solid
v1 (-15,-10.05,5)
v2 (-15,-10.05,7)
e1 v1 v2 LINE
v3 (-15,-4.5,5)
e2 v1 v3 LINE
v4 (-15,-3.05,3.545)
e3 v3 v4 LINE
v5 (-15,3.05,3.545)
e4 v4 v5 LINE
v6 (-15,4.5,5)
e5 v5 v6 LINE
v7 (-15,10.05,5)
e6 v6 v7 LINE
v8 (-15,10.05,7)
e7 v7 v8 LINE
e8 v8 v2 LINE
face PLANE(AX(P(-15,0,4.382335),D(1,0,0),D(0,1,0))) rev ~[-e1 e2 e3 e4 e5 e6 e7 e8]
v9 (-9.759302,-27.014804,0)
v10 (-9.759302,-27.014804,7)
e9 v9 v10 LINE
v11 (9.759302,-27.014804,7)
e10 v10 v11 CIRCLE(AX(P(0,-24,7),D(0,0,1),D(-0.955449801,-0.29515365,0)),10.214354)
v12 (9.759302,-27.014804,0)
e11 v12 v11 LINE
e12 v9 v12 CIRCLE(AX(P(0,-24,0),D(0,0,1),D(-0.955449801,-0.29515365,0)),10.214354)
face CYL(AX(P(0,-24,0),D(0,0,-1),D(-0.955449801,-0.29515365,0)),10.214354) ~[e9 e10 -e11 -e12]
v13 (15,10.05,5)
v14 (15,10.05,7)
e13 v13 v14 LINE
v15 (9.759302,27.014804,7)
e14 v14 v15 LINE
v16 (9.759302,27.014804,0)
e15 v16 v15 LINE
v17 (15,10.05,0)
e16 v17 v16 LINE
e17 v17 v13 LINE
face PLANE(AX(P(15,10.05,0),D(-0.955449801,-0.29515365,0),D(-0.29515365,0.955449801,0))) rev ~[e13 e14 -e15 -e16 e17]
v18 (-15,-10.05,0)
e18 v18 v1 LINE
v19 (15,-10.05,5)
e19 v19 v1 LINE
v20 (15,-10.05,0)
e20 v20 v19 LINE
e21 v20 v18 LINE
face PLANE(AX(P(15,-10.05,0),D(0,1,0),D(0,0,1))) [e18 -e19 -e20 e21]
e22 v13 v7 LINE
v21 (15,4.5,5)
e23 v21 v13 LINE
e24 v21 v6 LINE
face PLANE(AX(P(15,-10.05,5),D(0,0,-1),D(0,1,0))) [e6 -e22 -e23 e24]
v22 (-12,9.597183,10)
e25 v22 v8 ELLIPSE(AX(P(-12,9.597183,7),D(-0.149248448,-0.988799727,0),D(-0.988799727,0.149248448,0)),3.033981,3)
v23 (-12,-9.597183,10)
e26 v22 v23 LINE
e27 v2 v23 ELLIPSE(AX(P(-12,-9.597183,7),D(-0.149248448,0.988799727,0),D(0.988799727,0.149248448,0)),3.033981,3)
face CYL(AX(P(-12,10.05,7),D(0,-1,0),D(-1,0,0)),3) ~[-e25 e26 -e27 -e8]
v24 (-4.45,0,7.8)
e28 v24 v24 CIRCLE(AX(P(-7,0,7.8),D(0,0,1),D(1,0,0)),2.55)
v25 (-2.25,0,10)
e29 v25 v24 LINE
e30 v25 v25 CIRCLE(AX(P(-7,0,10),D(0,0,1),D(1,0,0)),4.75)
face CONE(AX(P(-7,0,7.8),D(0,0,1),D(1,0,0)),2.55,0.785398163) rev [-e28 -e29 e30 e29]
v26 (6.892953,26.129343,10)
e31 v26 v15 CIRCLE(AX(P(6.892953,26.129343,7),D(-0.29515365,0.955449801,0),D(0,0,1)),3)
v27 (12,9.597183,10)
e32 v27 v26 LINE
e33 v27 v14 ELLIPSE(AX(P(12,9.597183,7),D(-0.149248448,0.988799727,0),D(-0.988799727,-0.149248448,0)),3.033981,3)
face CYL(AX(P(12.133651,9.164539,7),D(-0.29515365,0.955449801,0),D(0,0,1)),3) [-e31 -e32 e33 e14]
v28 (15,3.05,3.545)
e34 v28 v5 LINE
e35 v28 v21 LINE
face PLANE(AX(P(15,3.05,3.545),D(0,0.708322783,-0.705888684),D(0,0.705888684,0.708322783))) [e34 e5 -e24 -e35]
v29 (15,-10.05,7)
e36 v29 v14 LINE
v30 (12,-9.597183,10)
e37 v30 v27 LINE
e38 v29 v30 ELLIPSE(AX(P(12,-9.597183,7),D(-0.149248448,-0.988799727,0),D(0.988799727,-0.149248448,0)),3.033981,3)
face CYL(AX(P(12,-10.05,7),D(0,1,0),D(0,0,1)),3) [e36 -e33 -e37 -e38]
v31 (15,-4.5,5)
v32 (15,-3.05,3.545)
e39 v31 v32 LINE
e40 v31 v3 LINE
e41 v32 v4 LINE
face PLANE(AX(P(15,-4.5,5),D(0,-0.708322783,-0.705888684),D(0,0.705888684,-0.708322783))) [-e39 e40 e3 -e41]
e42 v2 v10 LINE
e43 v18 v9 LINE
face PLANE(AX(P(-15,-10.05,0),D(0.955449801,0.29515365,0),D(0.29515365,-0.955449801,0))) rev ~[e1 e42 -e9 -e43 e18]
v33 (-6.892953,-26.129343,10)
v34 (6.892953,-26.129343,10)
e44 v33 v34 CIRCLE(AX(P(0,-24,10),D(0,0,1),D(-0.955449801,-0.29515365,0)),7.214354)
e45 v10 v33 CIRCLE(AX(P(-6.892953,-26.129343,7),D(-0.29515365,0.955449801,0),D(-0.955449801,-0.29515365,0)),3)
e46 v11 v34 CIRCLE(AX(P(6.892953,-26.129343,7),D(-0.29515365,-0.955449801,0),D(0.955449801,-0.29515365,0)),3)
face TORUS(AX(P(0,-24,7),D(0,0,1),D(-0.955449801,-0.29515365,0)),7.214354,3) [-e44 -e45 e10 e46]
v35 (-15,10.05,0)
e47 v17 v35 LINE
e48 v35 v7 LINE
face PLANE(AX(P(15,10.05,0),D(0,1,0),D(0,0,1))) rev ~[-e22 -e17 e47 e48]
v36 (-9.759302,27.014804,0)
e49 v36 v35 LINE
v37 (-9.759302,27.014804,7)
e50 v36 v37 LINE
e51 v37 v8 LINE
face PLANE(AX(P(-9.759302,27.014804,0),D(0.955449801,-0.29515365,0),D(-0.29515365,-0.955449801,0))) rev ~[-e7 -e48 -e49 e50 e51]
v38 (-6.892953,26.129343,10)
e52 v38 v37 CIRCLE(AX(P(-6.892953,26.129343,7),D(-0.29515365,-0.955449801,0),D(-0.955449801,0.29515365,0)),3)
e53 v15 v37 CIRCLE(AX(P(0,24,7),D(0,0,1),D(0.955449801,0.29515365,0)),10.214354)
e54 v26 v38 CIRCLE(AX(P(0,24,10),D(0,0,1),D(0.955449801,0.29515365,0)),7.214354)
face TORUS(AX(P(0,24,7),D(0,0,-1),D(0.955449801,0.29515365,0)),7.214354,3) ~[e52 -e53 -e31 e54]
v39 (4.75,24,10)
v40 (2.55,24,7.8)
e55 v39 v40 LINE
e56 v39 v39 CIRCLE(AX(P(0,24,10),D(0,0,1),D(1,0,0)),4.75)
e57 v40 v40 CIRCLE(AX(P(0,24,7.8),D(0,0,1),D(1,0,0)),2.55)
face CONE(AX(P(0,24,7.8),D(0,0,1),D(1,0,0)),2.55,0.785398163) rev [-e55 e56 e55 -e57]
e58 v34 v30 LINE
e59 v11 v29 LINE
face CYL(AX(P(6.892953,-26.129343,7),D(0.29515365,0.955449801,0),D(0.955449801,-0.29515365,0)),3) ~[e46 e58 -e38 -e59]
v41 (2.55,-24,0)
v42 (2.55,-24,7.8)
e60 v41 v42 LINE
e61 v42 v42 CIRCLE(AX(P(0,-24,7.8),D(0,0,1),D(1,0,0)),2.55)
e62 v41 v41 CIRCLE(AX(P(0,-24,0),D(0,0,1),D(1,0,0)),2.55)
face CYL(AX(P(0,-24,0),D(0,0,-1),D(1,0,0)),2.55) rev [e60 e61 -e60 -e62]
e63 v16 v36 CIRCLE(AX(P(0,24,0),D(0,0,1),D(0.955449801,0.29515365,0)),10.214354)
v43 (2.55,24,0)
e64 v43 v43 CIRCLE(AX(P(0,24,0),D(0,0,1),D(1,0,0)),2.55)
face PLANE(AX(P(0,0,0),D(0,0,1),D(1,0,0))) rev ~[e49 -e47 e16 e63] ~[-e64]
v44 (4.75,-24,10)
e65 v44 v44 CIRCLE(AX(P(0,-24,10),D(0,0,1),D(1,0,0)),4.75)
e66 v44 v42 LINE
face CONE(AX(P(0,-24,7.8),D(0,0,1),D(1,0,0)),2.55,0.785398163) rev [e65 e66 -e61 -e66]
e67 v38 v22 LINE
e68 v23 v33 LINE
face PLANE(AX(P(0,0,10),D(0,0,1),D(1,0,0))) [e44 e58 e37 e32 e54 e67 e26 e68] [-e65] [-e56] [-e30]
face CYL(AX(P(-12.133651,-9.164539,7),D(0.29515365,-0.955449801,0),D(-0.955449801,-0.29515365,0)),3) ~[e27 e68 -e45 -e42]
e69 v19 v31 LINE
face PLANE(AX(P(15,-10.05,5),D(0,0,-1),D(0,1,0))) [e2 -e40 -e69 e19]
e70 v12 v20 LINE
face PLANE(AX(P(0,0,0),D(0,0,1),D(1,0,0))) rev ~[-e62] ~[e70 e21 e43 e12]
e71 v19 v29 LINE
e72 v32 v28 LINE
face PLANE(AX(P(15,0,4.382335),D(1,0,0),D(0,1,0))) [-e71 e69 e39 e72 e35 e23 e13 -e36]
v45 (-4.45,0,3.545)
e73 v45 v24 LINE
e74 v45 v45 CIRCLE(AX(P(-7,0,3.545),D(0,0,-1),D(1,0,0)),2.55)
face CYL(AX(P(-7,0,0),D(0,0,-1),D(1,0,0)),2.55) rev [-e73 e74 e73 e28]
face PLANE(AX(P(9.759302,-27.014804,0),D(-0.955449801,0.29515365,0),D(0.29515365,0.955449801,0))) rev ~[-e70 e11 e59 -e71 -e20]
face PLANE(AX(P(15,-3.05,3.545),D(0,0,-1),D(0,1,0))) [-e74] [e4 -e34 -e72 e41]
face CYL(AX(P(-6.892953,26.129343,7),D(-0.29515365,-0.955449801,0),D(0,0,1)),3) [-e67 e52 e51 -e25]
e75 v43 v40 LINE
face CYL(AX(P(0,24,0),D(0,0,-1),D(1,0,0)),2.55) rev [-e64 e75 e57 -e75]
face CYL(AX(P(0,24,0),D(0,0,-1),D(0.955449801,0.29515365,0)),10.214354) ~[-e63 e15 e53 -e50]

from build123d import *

# Parameters (mm, degrees)
F0_R     = 2.55
F1_DEPTH = 10
F2_W     = 20.1
F2_H     = 5
F3_DEPTH = 30.001
F5_DEPTH = 30
F6_DEPTH = 10
F7_R     = 3
F8_SIZE  = 2.2


# Not quite as in the source:
# - a feature names something its author has since deleted; it is built from what else it names


with BuildPart() as f1:
    # F0 (on Top) → F1 (new body)
    with BuildSketch(Plane.XY):
        with BuildLine():
            Line((-9.7593021288, 27.0148037464), (-15, 10.05))
            Line((-15, 10.05), (-15, -10.05))
            Line((-15, -10.05), (-9.7593021288, -27.0148037464))
            ThreePointArc((-9.7593021288, -27.0148037464), (0, -34.21435361), (9.7593021288, -27.0148037464))
            Line((9.7593021288, -27.0148037464), (15, -10.05))
            Line((15, -10.05), (15, 10.05))
            Line((15, 10.05), (9.7593021288, 27.0148037464))
            ThreePointArc((9.7593021288, 27.0148037464), (0, 34.21435361), (-9.7593021288, 27.0148037464))
        make_face()
        with Locations((-7, 0)):
            Circle(F0_R, mode=Mode.SUBTRACT)
        with Locations((0, 24)):
            Circle(F0_R, mode=Mode.SUBTRACT)
        with Locations((0, -24)):
            Circle(F0_R, mode=Mode.SUBTRACT)
    extrude(amount=F1_DEPTH)

    # F2 (on face) → F3 (cut, through all)
    with BuildSketch(Plane.YZ.offset(15)):
        with Locations((0, 2.5)):
            Rectangle(F2_W, F2_H)
    extrude(amount=-F3_DEPTH, mode=Mode.SUBTRACT)

    # F4 (on face) → F5 (join, through all)
    with BuildSketch(Plane.YZ.offset(15)):
        Polygon((3.05, 3.545), (4.5, 5), (-4.5, 5), (-3.05, 3.545), align=None)
    extrude(amount=-F5_DEPTH)

    # F0 (on Top) → F6 (cut, through all)
    with BuildSketch(Plane.XY):
        with Locations((-7, 0)):
            Circle(F0_R)
    extrude(amount=F6_DEPTH, mode=Mode.SUBTRACT)

    # F7
    f7_edges = [f1.edges().sort_by_distance(p)[0] for p in [
        (-12.379651, 18.532402, 10),
        (12.379651, 18.532402, 10),
        (12.379651, -18.532402, 10),
        (-12.379651, -18.532402, 10),
        (15, 0, 10),
        (-15, 0, 10),
    ]]
    fillet(f7_edges, radius=F7_R)

    # F8
    f8_edges = [f1.edges().sort_by_distance(p)[0] for p in [
        (-2.55, -24, 10),
        (-9.55, 0, 10),
        (-2.55, 24, 10),
    ]]
    chamfer(f8_edges, length=F8_SIZE)


solid = f1.part
